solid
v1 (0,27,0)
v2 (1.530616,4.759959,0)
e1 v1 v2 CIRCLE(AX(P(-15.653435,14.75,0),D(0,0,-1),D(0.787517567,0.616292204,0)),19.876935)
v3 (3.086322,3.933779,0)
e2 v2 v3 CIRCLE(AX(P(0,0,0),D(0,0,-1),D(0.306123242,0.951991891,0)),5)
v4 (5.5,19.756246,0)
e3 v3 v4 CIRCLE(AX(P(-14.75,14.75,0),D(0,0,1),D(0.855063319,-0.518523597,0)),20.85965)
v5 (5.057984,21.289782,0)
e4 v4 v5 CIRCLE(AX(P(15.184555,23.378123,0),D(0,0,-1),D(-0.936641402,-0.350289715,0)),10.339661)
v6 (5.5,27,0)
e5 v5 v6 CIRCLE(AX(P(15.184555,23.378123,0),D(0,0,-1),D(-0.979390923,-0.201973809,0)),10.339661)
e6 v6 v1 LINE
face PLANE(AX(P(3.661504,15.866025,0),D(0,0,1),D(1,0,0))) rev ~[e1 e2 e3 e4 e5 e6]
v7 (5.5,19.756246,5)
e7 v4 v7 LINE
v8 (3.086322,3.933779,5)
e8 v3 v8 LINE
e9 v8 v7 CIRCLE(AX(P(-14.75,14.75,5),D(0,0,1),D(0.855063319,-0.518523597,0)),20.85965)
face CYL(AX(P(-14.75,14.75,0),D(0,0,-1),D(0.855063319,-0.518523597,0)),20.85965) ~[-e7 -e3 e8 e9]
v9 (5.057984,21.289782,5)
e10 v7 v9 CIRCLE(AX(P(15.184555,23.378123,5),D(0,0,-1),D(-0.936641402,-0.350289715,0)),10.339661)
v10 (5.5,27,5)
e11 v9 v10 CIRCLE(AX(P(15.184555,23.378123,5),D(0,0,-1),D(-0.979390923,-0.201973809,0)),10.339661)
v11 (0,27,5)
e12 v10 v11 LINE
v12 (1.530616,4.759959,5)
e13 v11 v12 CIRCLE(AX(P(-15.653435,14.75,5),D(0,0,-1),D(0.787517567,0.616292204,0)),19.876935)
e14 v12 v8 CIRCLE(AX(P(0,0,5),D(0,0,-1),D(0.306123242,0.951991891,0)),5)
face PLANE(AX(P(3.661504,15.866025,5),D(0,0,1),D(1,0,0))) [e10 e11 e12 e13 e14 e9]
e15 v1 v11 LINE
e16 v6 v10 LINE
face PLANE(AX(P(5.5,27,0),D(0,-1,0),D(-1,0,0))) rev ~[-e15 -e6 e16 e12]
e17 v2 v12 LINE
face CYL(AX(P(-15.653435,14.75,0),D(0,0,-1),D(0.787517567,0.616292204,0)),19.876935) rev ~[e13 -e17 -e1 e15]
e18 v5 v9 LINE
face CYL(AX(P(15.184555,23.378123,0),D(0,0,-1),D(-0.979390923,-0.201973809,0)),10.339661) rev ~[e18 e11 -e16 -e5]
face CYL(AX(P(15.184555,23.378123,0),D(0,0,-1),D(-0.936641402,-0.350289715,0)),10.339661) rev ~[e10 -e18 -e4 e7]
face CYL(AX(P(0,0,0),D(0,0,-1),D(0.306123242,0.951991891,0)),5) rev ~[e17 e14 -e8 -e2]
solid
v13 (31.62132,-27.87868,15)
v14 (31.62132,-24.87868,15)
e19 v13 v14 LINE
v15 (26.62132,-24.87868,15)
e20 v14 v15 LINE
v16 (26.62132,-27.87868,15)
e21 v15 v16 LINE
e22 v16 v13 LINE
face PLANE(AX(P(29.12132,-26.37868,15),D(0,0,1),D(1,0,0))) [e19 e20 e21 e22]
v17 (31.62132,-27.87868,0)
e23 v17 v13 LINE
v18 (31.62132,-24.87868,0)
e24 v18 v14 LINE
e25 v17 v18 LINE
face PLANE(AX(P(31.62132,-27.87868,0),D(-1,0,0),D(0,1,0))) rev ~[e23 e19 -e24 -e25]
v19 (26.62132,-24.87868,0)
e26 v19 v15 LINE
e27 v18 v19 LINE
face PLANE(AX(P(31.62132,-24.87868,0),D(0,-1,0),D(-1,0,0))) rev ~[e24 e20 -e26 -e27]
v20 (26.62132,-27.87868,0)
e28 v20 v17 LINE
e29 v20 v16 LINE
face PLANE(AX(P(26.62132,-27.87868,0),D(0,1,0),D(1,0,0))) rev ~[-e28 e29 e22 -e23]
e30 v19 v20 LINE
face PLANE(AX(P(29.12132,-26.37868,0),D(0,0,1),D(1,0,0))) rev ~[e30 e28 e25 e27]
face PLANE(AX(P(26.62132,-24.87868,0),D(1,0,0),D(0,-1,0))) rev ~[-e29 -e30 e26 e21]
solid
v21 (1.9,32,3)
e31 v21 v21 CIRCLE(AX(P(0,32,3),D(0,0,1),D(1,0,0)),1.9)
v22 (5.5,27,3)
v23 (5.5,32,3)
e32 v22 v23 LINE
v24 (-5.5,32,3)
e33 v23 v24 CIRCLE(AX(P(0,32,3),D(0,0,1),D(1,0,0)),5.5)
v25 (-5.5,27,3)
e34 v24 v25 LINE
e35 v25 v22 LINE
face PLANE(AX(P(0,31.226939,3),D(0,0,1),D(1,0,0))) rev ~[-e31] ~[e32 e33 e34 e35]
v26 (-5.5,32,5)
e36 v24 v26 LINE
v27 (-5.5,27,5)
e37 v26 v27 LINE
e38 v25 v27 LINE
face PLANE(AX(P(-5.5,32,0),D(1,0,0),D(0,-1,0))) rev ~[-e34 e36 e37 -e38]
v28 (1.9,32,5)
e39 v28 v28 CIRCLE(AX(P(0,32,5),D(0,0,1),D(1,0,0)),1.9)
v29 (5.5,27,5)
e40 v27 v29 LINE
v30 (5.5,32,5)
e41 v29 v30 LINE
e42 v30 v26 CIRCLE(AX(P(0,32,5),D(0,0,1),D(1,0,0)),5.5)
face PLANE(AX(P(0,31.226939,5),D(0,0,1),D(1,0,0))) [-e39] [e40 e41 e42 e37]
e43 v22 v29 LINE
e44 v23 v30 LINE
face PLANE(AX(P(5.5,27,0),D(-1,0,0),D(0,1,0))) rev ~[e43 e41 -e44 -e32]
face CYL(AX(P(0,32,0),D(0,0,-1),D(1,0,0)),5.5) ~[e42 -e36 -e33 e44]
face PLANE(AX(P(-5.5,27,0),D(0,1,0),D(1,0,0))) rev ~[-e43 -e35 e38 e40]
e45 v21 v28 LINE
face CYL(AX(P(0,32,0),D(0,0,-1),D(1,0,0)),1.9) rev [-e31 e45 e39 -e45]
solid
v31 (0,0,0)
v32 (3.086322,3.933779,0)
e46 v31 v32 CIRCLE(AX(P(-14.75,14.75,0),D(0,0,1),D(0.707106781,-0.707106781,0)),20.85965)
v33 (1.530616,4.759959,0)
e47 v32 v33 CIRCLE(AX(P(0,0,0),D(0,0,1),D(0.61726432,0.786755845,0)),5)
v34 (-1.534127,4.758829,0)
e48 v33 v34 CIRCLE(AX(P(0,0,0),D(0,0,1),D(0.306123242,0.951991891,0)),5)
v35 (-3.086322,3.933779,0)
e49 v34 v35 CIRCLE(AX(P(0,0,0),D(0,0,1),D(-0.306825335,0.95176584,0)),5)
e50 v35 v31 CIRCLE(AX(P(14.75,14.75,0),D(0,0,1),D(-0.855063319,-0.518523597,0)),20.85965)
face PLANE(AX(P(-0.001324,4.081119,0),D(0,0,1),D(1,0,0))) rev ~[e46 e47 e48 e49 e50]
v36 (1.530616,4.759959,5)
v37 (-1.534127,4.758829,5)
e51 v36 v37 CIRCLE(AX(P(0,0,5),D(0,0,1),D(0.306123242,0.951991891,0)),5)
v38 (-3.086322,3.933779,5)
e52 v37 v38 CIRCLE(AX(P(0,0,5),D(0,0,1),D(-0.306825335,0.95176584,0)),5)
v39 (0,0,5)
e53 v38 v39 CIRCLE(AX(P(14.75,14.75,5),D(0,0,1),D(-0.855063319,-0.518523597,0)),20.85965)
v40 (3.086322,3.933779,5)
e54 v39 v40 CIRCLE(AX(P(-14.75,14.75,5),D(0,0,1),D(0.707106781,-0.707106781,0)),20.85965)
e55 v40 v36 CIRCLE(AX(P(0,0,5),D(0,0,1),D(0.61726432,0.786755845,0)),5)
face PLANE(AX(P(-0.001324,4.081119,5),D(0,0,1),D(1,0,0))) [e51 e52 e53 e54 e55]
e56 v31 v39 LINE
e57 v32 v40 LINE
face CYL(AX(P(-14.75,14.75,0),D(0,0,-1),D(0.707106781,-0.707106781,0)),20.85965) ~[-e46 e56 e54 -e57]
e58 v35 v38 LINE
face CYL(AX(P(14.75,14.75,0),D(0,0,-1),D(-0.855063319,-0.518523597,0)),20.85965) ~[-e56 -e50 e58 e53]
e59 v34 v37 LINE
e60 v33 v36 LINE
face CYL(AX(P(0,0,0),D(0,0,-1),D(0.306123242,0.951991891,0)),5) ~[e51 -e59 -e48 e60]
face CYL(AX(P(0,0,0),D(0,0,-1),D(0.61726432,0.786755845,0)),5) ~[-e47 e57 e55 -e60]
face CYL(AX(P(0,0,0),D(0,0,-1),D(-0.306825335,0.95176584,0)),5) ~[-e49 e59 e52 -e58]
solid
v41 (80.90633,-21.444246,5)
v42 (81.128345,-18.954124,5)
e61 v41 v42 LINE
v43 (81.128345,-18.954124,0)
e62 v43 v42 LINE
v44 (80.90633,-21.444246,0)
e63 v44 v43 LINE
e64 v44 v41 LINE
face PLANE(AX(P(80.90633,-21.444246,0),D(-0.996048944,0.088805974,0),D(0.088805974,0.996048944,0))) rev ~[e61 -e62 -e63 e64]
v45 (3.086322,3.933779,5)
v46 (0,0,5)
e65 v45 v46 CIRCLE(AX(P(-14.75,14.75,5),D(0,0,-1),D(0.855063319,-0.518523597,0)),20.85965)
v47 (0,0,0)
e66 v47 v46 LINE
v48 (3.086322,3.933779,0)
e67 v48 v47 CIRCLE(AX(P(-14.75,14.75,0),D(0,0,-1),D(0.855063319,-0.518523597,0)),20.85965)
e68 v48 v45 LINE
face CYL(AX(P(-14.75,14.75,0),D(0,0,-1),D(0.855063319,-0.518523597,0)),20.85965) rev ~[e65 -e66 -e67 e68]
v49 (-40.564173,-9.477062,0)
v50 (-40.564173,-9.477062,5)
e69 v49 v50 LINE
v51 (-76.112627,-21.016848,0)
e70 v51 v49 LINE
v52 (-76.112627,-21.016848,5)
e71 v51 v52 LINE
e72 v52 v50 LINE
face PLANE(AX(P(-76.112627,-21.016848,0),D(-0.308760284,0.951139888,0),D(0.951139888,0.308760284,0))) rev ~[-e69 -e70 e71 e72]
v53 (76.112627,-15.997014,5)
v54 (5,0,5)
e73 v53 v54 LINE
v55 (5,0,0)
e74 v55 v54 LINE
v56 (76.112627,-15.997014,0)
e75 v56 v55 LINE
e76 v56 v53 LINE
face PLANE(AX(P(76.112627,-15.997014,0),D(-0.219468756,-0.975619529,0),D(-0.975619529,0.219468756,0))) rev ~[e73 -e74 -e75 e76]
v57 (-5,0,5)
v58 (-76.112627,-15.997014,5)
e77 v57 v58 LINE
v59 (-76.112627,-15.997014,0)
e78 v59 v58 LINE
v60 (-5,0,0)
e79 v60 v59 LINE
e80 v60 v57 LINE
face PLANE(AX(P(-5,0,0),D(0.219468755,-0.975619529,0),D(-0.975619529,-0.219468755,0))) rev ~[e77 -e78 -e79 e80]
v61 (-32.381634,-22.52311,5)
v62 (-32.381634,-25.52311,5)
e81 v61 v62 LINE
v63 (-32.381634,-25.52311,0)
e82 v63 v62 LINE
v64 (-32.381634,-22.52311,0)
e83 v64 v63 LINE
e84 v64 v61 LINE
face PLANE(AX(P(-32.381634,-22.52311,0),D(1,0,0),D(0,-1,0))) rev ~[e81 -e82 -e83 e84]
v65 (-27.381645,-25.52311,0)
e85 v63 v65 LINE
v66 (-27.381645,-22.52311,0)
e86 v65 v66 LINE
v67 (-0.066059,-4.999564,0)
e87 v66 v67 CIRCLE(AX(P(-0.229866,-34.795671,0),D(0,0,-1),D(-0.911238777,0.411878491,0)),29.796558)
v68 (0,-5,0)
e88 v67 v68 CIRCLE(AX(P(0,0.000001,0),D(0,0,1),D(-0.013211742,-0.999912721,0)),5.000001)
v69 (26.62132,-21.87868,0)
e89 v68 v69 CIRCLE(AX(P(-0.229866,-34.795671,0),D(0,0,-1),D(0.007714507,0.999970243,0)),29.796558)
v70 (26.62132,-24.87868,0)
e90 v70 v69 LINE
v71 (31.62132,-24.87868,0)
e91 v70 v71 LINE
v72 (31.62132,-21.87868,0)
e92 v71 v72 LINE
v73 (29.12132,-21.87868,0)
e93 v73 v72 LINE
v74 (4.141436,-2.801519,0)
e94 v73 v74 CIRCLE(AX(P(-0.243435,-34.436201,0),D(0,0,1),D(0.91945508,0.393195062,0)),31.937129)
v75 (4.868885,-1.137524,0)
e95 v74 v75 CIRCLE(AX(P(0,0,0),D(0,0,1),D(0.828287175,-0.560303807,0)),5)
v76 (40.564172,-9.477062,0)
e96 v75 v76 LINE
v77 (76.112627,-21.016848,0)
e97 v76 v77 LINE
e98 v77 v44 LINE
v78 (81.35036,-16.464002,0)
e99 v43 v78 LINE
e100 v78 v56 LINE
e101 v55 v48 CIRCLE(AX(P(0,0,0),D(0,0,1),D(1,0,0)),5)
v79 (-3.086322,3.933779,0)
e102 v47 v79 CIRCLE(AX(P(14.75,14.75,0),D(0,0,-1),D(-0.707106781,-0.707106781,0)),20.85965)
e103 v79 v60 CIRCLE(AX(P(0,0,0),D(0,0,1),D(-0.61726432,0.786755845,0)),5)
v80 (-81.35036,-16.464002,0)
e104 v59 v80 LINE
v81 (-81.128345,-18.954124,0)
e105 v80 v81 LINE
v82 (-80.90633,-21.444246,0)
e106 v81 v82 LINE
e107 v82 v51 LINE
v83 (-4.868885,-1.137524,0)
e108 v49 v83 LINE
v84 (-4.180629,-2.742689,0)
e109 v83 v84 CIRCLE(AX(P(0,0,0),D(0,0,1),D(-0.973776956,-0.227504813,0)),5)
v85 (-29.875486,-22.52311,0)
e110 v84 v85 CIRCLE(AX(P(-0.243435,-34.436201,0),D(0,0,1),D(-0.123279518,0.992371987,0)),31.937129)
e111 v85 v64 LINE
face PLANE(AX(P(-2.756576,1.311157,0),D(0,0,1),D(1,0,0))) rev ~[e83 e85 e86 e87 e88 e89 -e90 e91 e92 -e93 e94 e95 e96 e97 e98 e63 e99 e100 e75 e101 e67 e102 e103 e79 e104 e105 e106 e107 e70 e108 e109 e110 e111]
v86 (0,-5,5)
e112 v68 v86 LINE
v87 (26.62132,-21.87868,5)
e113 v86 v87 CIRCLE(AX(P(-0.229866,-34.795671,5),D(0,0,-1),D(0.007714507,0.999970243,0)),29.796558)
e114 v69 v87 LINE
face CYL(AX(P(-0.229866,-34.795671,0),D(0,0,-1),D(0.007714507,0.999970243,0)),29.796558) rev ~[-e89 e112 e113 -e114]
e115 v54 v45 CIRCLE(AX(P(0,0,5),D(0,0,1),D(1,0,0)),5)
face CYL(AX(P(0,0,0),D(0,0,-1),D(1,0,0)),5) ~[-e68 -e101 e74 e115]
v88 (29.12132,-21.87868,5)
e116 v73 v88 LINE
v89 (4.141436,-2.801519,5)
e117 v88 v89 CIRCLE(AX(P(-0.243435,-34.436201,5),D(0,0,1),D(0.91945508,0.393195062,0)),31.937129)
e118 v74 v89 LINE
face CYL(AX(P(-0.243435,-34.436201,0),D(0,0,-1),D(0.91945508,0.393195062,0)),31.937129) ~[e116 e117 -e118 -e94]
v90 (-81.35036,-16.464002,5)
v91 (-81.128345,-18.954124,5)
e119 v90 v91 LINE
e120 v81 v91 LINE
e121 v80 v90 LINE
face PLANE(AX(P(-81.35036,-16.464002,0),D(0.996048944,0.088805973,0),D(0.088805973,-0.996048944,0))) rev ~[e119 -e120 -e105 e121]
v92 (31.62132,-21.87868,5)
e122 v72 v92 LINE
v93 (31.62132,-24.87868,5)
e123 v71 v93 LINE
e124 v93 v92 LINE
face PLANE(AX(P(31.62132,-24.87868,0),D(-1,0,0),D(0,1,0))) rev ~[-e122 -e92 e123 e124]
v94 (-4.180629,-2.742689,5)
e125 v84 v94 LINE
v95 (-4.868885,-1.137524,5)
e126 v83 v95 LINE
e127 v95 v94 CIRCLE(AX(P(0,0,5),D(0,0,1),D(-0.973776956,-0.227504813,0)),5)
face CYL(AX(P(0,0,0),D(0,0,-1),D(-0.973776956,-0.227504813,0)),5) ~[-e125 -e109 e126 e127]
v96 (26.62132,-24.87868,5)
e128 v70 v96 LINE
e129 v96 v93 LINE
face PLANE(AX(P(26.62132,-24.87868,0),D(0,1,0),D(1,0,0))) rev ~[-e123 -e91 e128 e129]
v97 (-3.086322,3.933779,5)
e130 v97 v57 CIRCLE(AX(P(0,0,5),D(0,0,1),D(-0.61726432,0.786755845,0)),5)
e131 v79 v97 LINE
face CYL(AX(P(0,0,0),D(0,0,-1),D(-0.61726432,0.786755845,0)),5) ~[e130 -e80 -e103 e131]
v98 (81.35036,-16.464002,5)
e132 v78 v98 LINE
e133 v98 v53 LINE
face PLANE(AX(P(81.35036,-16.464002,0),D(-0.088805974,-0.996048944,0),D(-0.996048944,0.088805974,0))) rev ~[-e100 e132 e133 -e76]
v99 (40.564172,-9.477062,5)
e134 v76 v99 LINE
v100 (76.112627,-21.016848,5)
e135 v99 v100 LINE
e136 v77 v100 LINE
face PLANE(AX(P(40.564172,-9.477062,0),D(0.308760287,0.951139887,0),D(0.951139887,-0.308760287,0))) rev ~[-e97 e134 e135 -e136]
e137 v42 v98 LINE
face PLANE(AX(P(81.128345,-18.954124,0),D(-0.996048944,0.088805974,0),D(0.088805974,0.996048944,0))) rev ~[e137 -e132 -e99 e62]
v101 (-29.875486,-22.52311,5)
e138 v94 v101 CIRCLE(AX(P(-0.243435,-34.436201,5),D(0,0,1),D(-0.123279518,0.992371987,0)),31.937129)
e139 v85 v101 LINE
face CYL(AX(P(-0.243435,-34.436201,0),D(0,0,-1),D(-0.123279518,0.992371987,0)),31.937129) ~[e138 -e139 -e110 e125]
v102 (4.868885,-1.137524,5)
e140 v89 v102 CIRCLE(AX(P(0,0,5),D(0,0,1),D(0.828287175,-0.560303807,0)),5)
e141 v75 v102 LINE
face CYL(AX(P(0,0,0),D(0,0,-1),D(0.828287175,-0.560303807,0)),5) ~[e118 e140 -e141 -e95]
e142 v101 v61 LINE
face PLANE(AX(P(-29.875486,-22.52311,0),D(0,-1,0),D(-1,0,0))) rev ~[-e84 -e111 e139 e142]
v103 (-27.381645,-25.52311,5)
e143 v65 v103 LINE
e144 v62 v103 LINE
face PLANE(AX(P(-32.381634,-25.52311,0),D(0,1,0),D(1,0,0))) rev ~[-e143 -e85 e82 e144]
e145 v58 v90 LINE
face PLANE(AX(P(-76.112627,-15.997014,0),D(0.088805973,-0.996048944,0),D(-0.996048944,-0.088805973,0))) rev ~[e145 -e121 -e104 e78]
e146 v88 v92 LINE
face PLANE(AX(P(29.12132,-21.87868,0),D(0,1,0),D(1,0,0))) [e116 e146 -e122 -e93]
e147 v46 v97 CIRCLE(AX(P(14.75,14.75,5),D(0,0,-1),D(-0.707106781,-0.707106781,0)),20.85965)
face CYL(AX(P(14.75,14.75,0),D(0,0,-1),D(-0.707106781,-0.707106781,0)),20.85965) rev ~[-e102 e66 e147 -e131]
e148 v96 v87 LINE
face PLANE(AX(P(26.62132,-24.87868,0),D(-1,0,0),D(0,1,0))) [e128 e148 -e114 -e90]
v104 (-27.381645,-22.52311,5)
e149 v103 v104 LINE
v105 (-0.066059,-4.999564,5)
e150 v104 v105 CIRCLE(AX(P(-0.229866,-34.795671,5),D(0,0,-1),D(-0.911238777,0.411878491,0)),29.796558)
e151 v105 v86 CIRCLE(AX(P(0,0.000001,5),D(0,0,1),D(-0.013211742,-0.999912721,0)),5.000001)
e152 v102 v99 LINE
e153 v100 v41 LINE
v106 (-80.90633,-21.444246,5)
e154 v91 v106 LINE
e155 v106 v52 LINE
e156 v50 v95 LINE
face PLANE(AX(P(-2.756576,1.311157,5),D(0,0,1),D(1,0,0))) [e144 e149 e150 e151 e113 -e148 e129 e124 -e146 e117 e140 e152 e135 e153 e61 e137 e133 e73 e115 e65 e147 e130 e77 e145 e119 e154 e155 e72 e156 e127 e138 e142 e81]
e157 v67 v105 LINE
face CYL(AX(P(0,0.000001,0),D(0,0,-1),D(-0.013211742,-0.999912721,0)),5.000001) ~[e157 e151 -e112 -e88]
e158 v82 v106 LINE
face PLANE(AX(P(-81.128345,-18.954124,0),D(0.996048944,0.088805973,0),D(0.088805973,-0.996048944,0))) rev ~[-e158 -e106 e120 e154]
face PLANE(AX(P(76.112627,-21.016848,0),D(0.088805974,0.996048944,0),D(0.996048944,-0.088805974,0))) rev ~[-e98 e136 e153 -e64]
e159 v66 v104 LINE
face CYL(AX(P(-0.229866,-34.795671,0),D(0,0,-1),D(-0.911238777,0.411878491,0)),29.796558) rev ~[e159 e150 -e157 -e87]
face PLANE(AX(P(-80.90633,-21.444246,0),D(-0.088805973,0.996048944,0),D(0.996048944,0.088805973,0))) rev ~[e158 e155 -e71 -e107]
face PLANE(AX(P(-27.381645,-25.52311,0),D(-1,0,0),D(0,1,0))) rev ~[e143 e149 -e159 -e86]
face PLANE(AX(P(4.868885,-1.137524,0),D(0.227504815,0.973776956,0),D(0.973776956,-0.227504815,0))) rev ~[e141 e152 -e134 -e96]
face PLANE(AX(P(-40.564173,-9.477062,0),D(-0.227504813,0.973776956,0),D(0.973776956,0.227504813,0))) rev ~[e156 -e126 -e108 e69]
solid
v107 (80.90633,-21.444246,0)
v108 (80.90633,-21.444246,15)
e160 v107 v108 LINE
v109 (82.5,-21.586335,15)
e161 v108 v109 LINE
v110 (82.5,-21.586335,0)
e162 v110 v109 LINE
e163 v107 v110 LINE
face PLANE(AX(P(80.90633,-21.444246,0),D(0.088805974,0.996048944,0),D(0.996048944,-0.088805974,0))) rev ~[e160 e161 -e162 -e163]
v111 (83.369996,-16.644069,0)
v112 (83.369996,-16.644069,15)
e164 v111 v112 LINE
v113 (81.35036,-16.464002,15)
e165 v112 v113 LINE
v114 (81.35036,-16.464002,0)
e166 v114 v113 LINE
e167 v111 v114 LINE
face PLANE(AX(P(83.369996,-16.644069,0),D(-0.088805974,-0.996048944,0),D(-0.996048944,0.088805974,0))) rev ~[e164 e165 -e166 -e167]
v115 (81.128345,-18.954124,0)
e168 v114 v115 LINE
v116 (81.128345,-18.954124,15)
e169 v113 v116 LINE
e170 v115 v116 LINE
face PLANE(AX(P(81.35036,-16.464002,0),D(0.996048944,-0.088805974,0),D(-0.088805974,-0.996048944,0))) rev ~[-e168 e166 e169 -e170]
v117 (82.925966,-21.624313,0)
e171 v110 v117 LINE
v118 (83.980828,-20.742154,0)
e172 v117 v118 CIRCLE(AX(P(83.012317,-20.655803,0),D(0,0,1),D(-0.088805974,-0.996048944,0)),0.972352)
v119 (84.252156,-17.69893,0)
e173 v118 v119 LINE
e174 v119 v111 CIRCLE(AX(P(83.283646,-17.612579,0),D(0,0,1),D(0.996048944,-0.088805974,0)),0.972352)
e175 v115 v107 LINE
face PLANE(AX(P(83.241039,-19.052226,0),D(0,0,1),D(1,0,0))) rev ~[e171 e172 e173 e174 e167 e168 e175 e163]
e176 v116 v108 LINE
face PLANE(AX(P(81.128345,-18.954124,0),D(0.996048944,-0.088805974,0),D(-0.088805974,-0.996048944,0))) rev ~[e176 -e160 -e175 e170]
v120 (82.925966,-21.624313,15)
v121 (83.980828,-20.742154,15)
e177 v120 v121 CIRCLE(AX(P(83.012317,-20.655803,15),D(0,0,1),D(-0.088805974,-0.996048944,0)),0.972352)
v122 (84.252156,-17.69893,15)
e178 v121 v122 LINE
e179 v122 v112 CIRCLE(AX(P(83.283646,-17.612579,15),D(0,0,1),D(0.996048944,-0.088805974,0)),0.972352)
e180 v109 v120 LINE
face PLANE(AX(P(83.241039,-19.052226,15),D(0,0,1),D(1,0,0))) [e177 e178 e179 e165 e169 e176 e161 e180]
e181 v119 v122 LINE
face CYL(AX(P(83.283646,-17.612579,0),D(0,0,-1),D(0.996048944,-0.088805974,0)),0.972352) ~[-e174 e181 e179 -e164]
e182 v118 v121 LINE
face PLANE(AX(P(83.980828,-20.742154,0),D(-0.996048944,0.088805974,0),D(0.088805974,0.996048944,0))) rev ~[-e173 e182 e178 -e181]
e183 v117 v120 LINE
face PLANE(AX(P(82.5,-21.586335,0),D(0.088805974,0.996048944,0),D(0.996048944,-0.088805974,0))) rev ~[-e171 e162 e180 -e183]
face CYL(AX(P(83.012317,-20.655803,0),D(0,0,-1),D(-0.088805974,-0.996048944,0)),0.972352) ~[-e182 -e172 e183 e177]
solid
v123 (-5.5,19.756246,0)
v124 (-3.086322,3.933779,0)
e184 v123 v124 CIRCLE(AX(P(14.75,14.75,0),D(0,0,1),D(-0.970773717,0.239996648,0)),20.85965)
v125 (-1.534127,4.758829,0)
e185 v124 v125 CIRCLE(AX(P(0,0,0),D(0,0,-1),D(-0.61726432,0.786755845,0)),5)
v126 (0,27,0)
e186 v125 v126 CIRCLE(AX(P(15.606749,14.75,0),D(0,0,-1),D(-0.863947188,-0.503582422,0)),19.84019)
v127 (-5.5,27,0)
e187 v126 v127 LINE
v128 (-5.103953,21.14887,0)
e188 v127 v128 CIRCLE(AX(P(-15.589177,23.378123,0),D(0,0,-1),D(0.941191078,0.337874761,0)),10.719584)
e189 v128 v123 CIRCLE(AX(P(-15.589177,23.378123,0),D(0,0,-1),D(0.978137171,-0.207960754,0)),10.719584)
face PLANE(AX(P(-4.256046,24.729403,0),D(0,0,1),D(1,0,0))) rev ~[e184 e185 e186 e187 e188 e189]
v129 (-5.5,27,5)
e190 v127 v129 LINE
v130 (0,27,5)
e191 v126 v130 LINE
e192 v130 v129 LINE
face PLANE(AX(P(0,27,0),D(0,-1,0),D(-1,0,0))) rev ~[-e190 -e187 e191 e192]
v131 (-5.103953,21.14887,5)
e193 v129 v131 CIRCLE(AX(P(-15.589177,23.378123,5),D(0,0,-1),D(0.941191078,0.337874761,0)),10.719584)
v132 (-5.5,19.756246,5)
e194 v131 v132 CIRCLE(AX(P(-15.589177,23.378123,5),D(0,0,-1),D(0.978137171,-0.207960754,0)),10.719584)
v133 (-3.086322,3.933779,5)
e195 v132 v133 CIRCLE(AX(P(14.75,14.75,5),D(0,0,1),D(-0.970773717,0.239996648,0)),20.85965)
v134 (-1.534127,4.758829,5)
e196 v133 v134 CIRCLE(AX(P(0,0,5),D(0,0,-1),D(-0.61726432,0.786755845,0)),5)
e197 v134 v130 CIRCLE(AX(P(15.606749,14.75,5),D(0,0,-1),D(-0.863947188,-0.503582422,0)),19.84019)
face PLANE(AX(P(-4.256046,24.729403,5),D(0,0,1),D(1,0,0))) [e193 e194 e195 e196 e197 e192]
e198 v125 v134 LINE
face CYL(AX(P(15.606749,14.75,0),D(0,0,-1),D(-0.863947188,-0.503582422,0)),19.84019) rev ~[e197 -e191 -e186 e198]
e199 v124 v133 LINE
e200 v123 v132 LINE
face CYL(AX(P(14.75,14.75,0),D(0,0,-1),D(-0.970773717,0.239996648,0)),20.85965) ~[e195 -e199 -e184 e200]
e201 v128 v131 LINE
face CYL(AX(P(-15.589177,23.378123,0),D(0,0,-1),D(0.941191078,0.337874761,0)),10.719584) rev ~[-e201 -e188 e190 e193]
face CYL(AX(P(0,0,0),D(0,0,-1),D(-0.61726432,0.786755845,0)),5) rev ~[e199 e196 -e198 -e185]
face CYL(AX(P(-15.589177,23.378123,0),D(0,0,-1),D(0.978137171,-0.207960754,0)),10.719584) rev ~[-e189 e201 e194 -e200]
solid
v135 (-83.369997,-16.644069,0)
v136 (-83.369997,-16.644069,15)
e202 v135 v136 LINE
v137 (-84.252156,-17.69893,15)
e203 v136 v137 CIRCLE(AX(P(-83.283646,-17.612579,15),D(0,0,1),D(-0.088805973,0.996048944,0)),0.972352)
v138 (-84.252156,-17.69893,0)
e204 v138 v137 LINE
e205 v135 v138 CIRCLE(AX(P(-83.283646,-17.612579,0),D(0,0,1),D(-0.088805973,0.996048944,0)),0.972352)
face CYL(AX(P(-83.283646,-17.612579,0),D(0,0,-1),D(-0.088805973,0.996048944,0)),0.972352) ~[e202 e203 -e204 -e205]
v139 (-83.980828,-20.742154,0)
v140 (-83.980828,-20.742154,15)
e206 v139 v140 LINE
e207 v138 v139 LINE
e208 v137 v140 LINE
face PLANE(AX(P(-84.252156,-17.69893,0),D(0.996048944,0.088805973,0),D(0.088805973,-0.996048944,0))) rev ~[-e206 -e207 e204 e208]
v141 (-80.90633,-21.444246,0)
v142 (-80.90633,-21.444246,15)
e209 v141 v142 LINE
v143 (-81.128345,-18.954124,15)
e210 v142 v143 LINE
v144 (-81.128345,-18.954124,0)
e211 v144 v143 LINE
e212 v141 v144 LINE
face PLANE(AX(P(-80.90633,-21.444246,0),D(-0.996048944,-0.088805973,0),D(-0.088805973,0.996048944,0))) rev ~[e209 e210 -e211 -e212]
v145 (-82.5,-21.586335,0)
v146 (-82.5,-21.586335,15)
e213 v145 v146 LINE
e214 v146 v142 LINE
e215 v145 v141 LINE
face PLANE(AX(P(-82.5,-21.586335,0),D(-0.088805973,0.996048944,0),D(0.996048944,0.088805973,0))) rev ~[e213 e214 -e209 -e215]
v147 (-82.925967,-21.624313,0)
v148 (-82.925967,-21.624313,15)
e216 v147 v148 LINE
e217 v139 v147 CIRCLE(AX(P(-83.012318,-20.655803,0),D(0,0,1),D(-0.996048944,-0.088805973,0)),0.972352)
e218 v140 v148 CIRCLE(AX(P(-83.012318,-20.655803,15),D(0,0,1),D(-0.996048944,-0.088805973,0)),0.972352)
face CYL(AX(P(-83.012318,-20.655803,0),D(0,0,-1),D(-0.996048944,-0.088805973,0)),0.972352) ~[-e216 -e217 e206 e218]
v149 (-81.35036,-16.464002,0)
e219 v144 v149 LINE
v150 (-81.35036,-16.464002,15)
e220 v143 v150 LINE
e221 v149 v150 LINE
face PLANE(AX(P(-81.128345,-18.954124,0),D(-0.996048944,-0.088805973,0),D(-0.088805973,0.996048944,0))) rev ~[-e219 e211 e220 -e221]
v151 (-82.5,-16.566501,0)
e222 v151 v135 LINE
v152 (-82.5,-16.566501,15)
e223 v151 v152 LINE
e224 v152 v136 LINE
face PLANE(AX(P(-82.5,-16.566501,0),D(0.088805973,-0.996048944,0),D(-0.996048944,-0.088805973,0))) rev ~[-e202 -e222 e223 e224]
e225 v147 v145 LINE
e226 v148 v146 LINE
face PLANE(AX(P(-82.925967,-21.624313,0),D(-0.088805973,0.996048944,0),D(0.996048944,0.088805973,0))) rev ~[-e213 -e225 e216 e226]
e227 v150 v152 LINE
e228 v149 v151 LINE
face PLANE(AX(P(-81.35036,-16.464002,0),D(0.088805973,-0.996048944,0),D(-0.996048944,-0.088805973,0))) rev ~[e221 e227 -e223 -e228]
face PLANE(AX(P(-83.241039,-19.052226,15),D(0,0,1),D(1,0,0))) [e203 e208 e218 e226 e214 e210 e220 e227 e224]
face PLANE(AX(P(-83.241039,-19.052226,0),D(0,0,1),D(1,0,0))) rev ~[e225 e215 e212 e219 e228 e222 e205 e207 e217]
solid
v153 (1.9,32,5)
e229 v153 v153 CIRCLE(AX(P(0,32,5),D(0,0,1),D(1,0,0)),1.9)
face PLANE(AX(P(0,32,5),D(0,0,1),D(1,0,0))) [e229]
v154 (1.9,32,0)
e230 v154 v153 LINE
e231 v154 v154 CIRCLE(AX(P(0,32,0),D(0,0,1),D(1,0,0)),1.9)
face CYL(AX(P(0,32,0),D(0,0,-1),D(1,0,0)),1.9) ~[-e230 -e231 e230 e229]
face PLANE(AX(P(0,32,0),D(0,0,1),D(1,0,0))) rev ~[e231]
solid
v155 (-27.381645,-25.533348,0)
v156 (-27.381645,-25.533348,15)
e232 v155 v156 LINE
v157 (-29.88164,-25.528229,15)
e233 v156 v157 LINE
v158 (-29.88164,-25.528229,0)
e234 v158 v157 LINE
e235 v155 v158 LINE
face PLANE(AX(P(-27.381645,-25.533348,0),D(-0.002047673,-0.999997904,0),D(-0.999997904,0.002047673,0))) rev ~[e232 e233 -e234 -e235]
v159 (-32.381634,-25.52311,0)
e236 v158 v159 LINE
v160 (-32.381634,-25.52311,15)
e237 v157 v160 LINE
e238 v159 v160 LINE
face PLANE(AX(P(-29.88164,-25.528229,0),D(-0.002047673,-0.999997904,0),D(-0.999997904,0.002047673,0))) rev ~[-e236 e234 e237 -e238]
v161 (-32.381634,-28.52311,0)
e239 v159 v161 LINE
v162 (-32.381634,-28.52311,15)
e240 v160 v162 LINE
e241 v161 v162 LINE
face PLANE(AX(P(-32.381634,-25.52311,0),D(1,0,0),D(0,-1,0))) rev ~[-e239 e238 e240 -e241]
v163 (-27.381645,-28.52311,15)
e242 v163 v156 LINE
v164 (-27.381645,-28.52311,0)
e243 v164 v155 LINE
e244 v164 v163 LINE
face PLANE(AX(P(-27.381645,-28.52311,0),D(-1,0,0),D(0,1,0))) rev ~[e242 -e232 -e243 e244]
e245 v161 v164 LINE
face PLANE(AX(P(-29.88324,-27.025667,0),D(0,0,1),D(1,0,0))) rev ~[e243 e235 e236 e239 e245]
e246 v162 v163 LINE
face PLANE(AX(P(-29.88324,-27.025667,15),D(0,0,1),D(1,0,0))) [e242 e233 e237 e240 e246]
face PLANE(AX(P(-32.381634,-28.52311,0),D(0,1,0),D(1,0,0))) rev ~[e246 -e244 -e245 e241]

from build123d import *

# Parameters (mm, degrees)
F1_DEPTH = 15
F2_DEPTH = 5
F0_W     = 2.5
F0_H     = 3
F3_DEPTH = 5
F0_R     = 1.9
F4_DEPTH = 5
F5_DEPTH = 5
F6_DEPTH = 3


with BuildPart() as f1:
    # F0 (on Top) → F1 (new body)
    with BuildSketch(Plane.XY):
        with BuildLine():
            Line((-82.5, -21.5863350366), (-82.5, -16.5665013937))
            Line((-82.5, -16.5665013937), (-83.3699967597, -16.6440687753))
            ThreePointArc((-83.3699967597, -16.6440687753), (-84.0295454731, -16.9887980437), (-84.2521564375, -17.6989298148))
            Line((-84.2521564375, -17.6989298148), (-83.9808279356, -20.7421538184))
            ThreePointArc((-83.9808279356, -20.7421538184), (-83.6360986672, -21.4017025318), (-82.9259668961, -21.6243134962))
            Line((-82.9259668961, -21.6243134962), (-82.5, -21.5863350366))
        make_face()
        Polygon((-81.128345354, -18.9541238984), (-81.3503602858, -16.464001538), (-82.5, -16.5665013937), (-82.5, -21.5863350366), (-80.9063304222, -21.4442462589), align=None)
    extrude(amount=F1_DEPTH)


with BuildPart() as f1b:
    # F0 (on Top) → F1, piece 2 (new body)
    with BuildSketch(Plane.XY):
        with BuildLine():
            Line((83.3699963437, -16.6440687785), (82.5, -16.5665014329))
            Line((82.5, -16.5665014329), (82.5, -21.5863350764))
            Line((82.5, -21.5863350764), (82.9259664737, -21.6243134988))
            ThreePointArc((82.9259664737, -21.6243134988), (83.6360982451, -21.4017025353), (83.9808275143, -20.7421538224))
            Line((83.9808275143, -20.7421538224), (84.2521560202, -17.6989298191))
            ThreePointArc((84.2521560202, -17.6989298191), (84.0295450567, -16.9887980477), (83.3699963437, -16.6440687785))
        make_face()
        Polygon((82.5, -16.5665014329), (81.3503598701, -16.4640015386), (81.128344935, -18.9541238987), (80.90633, -21.4442462589), (82.5, -21.5863350764), align=None)
    extrude(amount=F1_DEPTH)


with BuildPart() as f1c:
    # F0 (on Top) → F1, piece 3 (new body)
    with BuildSketch(Plane.XY):
        Polygon((31.6213203436, -24.8786796564), (29.1213203436, -24.8786796564), (26.6213203436, -24.8786796564), (26.6213203436, -27.8786796564), (31.6213203436, -27.8786796564), align=None)
    extrude(amount=F1_DEPTH)


with BuildPart() as f1d:
    # F0 (on Top) → F1, piece 4 (new body)
    with BuildSketch(Plane.XY):
        Polygon((-29.8816396128, -25.5282291926), (-32.3816343716, -25.5231100091), (-32.3816343716, -28.5231100091), (-27.381644854, -28.5231100091), (-27.381644854, -25.5333483762), align=None)
    extrude(amount=F1_DEPTH)


with BuildPart() as f2:
    # F0 (on Top) → F2 (new body)
    with BuildSketch(Plane.XY):
        with BuildLine():
            Line((-2.1337940049, 27), (-5.5, 27))
            ThreePointArc((-5.5, 27), (-4.8940649659, 24.1020455305), (-5.1039532491, 21.1488702426))
            ThreePointArc((-5.1039532491, 21.1488702426), (-3.850388388, 24.1919569907), (-2.1337940049, 27))
        make_face()
        with BuildLine():
            Line((0, 27), (-2.1337940049, 27))
            ThreePointArc((-2.1337940049, 27), (-3.850388388, 24.1919569907), (-5.1039532491, 21.1488702426))
            ThreePointArc((-5.1039532491, 21.1488702426), (-5.278437838, 20.4458640026), (-5.5, 19.7562460986))
            ThreePointArc((-5.5, 19.7562460986), (-5.8710956961, 11.6043025747), (-3.0863215981, 3.9337792252))
            ThreePointArc((-3.0863215981, 3.9337792252), (-2.3467663768, 4.4150523862), (-1.5341266757, 4.7588291988))
            ThreePointArc((-1.5341266757, 4.7588291988), (-4.1864100938, 16.1152704866), (0, 27))
        make_face()
    extrude(amount=F2_DEPTH)


with BuildPart() as f2b:
    # F0 (on Top) → F2, piece 2 (new body)
    with BuildSketch(Plane.XY):
        with BuildLine():
            Line((2.1337940049, 27), (0, 27))
            ThreePointArc((0, 27), (4.1765920633, 16.1147529743), (1.5306162106, 4.7599594553))
            ThreePointArc((1.5306162106, 4.7599594553), (2.3451379758, 4.4159175575), (3.0863215981, 3.9337792252))
            ThreePointArc((3.0863215981, 3.9337792252), (5.8710956961, 11.6043025747), (5.5, 19.7562460986))
            ThreePointArc((5.5, 19.7562460986), (5.2493596136, 20.5144731098), (5.0579844363, 21.289782303))
            ThreePointArc((5.0579844363, 21.289782303), (3.8167255549, 24.2579809722), (2.1337940049, 27))
        make_face()
        with BuildLine():
            Line((5.5, 27), (2.1337940049, 27))
            ThreePointArc((2.1337940049, 27), (3.8167255549, 24.2579809722), (5.0579844363, 21.289782303))
            ThreePointArc((5.0579844363, 21.289782303), (4.8757325261, 24.1761066094), (5.5, 27))
        make_face()
    extrude(amount=F2_DEPTH)


with BuildPart() as f2c:
    # F0 (on Top) → F2, piece 3 (new body)
    with BuildSketch(Plane.XY):
        with BuildLine():
            ThreePointArc((0, 0), (-1.6614515986, 1.8740823074), (-3.0863215981, 3.9337792252))
            ThreePointArc((-3.0863215981, 3.9337792252), (-4.4961988385, 2.1872805043), (-5, 0))
            Line((-5, 0), (0, 0))
        make_face()
        with BuildLine():
            ThreePointArc((5, 0), (4.4961988385, 2.1872805043), (3.0863215981, 3.9337792252))
            ThreePointArc((3.0863215981, 3.9337792252), (1.6614515986, 1.8740823074), (0, 0))
            Line((0, 0), (5, 0))
        make_face()
        with BuildLine():
            Line((0, 0), (-5, 0))
            ThreePointArc((-5, 0), (-4.9671130397, -0.5725277732), (-4.8688847796, -1.137524067))
            Line((-4.8688847796, -1.137524067), (0, 0))
        make_face()
        with BuildLine():
            ThreePointArc((-4.8688847796, -1.137524067), (-4.9671130397, -0.5725277732), (-5, 0))
            Line((-5, 0), (-76.1126271301, -15.9970144582))
            Line((-76.1126271301, -15.9970144582), (-76.1126271301, -17.7822949373))
            Line((-76.1126271301, -17.7822949373), (-40.564172677, -9.4770619492))
            Line((-40.564172677, -9.4770619492), (-4.8688847796, -1.137524067))
        make_face()
        with BuildLine():
            Line((5, 0), (0, 0))
            Line((0, 0), (4.8688847783, -1.1375240726))
            ThreePointArc((4.8688847783, -1.1375240726), (4.9671130394, -0.572527776), (5, 0))
        make_face()
        with BuildLine():
            Line((0, -2.5), (0, 0))
            Line((0, 0), (-4.8688847796, -1.137524067))
            ThreePointArc((-4.8688847796, -1.137524067), (-4.5953849074, -1.9703902031), (-4.1806287521, -2.7426890522))
            ThreePointArc((-4.1806287521, -2.7426890522), (-2.0942964003, -2.5527490751), (0, -2.5))
        make_face()
        with BuildLine():
            Line((4.8688847783, -1.1375240726), (0, 0))
            Line((0, 0), (0, -2.5))
            ThreePointArc((0, -2.5), (2.0756234829, -2.5833806697), (4.1414358733, -2.8015190356))
            ThreePointArc((4.1414358733, -2.8015190356), (4.5813414379, -2.0028256613), (4.8688847783, -1.1375240726))
        make_face()
        with BuildLine():
            Line((76.1126265372, -15.9970144361), (5, 0))
            ThreePointArc((5, 0), (4.9671130394, -0.572527776), (4.8688847783, -1.1375240726))
            Line((4.8688847783, -1.1375240726), (40.5641724675, -9.4770619494))
            Line((40.5641724675, -9.4770619494), (76.1126265372, -17.7822948909))
            Line((76.1126265372, -17.7822948909), (76.1126265372, -15.9970144361))
        make_face()
        Polygon((-76.1126271301, -17.7822949373), (-76.1126271301, -15.9970144582), (-81.3503602858, -16.464001538), (-81.128345354, -18.9541238984), align=None)
        with BuildLine():
            ThreePointArc((4.1414358733, -2.8015190356), (2.0756234829, -2.5833806697), (0, -2.5))
            Line((0, -2.5), (0, -5))
            ThreePointArc((0, -5), (2.3443980914, -4.4163104045), (4.1414358733, -2.8015190356))
        make_face()
        with BuildLine():
            Line((0, -5), (0, -2.5))
            ThreePointArc((0, -2.5), (-2.0942964003, -2.5527490751), (-4.1806287521, -2.7426890522))
            ThreePointArc((-4.1806287521, -2.7426890522), (-2.4045705015, -4.3838385809), (-0.0660587142, -4.9995636056))
            ThreePointArc((-0.0660587142, -4.9995636056), (-0.0330300778, -4.9998909002), (0, -5))
        make_face()
        Polygon((81.3503598701, -16.4640015386), (76.1126265372, -15.9970144361), (76.1126265372, -17.7822948909), (81.128344935, -18.9541238987), align=None)
        with BuildLine():
            ThreePointArc((-0.0660587142, -4.9995636056), (-2.4045705015, -4.3838385809), (-4.1806287521, -2.7426890522))
            ThreePointArc((-4.1806287521, -2.7426890522), (-19.7252165616, -9.1292774686), (-29.8754860972, -22.5231100091))
            Line((-29.8754860972, -22.5231100091), (-27.381644854, -22.5231100091))
            ThreePointArc((-27.381644854, -22.5231100091), (-16.318878423, -9.7162267561), (-0.0660587142, -4.9995636056))
        make_face()
        Polygon((-76.1126271301, -21.0168481011), (-40.564172677, -9.4770619492), (-76.1126271301, -17.7822949373), align=None)
        Polygon((-76.1126271301, -21.0168481011), (-76.1126271301, -17.7822949373), (-81.128345354, -18.9541238984), (-80.9063304222, -21.4442462589), align=None)
        with BuildLine():
            ThreePointArc((29.1213203436, -21.8786796564), (19.1406778811, -9.0543892937), (4.1414358733, -2.8015190356))
            ThreePointArc((4.1414358733, -2.8015190356), (2.3443980914, -4.4163104045), (0, -5))
            ThreePointArc((0, -5), (15.7253308616, -9.6308830492), (26.6213203436, -21.8786796564))
            Line((26.6213203436, -21.8786796564), (29.1213203436, -21.8786796564))
        make_face()
        Polygon((76.1126265372, -17.7822948909), (40.5641724675, -9.4770619494), (76.1126265372, -21.0168480796), align=None)
        Polygon((81.128344935, -18.9541238987), (76.1126265372, -17.7822948909), (76.1126265372, -21.0168480796), (80.90633, -21.4442462589), align=None)
        Polygon((-29.8816291304, -25.5231100091), (-29.8754860972, -22.5231100091), (-32.3816343716, -22.5231100091), (-32.3816343716, -25.5231100091), align=None)
        Polygon((-27.381644854, -22.5231100091), (-29.8754860972, -22.5231100091), (-29.8816291304, -25.5231100091), (-27.381644854, -25.5231100091), align=None)
        with Locations((27.8713203436, -23.3786796564)):
            Rectangle(F0_W, F0_H)
        with Locations((30.3713203436, -23.3786796564)):
            Rectangle(F0_W, F0_H)
    extrude(amount=F2_DEPTH)


with BuildPart() as f3:
    # F0 (on Top) → F3 (new body)
    with BuildSketch(Plane.XY):
        with BuildLine():
            ThreePointArc((0, 2.5), (0.8041462109, 3.6036756124), (1.5306162106, 4.7599594553))
            ThreePointArc((1.5306162106, 4.7599594553), (-0.0018439661, 4.99999966), (-1.5341266757, 4.7588291988))
            ThreePointArc((-1.5341266757, 4.7588291988), (-0.8059688668, 3.6029911718), (0, 2.5))
        make_face()
        with BuildLine():
            ThreePointArc((3.0863215981, 3.9337792252), (2.3451379758, 4.4159175575), (1.5306162106, 4.7599594553))
            ThreePointArc((1.5306162106, 4.7599594553), (0.8041462109, 3.6036756124), (0, 2.5))
            ThreePointArc((0, 2.5), (-0.8059688668, 3.6029911718), (-1.5341266757, 4.7588291988))
            ThreePointArc((-1.5341266757, 4.7588291988), (-2.3467663768, 4.4150523862), (-3.0863215981, 3.9337792252))
            ThreePointArc((-3.0863215981, 3.9337792252), (-1.6614515986, 1.8740823074), (0, 0))
            ThreePointArc((0, 0), (1.6614515986, 1.8740823074), (3.0863215981, 3.9337792252))
        make_face()
    extrude(amount=F3_DEPTH)


with BuildPart() as f4:
    # F0 (on Top) → F4 (new body)
    with BuildSketch(Plane.XY):
        with Locations((0, 32)):
            Circle(F0_R)
    extrude(amount=F4_DEPTH)


with BuildPart() as f5:
    # F0 (on Top) → F5 (new body)
    with BuildSketch(Plane.XY):
        with BuildLine():
            Line((-5.5, 32), (-5.5, 27))
            Line((-5.5, 27), (-2.1337940049, 27))
            ThreePointArc((-2.1337940049, 27), (-1.1162134987, 28.2920924976), (0, 29.5))
            ThreePointArc((0, 29.5), (1.1162134987, 28.2920924976), (2.1337940049, 27))
            Line((2.1337940049, 27), (5.5, 27))
            Line((5.5, 27), (5.5, 32))
            ThreePointArc((5.5, 32), (0, 37.5), (-5.5, 32))
        make_face()
        with Locations((0, 32)):
            Circle(F0_R, mode=Mode.SUBTRACT)
        with BuildLine():
            ThreePointArc((0, 29.5), (-1.1162134987, 28.2920924976), (-2.1337940049, 27))
            Line((-2.1337940049, 27), (0, 27))
            Line((0, 27), (2.1337940049, 27))
            ThreePointArc((2.1337940049, 27), (1.1162134987, 28.2920924976), (0, 29.5))
        make_face()
    extrude(amount=F5_DEPTH)

    # F0 (on Top) → F6 (cut)
    with BuildSketch(Plane.XY):
        with BuildLine():
            Line((-5.5, 32), (-5.5, 27))
            Line((-5.5, 27), (-2.1337940049, 27))
            ThreePointArc((-2.1337940049, 27), (-1.1162134987, 28.2920924976), (0, 29.5))
            ThreePointArc((0, 29.5), (1.1162134987, 28.2920924976), (2.1337940049, 27))
            Line((2.1337940049, 27), (5.5, 27))
            Line((5.5, 27), (5.5, 32))
            ThreePointArc((5.5, 32), (0, 37.5), (-5.5, 32))
        make_face()
        with Locations((0, 32)):
            Circle(F0_R, mode=Mode.SUBTRACT)
        with BuildLine():
            ThreePointArc((0, 29.5), (-1.1162134987, 28.2920924976), (-2.1337940049, 27))
            Line((-2.1337940049, 27), (0, 27))
            Line((0, 27), (2.1337940049, 27))
            ThreePointArc((2.1337940049, 27), (1.1162134987, 28.2920924976), (0, 29.5))
        make_face()
    extrude(amount=F6_DEPTH, mode=Mode.SUBTRACT)


solid = Compound([f1.part, f1b.part, f1c.part, f1d.part, f2.part, f2b.part, f2c.part, f3.part, f4.part, f5.part])
